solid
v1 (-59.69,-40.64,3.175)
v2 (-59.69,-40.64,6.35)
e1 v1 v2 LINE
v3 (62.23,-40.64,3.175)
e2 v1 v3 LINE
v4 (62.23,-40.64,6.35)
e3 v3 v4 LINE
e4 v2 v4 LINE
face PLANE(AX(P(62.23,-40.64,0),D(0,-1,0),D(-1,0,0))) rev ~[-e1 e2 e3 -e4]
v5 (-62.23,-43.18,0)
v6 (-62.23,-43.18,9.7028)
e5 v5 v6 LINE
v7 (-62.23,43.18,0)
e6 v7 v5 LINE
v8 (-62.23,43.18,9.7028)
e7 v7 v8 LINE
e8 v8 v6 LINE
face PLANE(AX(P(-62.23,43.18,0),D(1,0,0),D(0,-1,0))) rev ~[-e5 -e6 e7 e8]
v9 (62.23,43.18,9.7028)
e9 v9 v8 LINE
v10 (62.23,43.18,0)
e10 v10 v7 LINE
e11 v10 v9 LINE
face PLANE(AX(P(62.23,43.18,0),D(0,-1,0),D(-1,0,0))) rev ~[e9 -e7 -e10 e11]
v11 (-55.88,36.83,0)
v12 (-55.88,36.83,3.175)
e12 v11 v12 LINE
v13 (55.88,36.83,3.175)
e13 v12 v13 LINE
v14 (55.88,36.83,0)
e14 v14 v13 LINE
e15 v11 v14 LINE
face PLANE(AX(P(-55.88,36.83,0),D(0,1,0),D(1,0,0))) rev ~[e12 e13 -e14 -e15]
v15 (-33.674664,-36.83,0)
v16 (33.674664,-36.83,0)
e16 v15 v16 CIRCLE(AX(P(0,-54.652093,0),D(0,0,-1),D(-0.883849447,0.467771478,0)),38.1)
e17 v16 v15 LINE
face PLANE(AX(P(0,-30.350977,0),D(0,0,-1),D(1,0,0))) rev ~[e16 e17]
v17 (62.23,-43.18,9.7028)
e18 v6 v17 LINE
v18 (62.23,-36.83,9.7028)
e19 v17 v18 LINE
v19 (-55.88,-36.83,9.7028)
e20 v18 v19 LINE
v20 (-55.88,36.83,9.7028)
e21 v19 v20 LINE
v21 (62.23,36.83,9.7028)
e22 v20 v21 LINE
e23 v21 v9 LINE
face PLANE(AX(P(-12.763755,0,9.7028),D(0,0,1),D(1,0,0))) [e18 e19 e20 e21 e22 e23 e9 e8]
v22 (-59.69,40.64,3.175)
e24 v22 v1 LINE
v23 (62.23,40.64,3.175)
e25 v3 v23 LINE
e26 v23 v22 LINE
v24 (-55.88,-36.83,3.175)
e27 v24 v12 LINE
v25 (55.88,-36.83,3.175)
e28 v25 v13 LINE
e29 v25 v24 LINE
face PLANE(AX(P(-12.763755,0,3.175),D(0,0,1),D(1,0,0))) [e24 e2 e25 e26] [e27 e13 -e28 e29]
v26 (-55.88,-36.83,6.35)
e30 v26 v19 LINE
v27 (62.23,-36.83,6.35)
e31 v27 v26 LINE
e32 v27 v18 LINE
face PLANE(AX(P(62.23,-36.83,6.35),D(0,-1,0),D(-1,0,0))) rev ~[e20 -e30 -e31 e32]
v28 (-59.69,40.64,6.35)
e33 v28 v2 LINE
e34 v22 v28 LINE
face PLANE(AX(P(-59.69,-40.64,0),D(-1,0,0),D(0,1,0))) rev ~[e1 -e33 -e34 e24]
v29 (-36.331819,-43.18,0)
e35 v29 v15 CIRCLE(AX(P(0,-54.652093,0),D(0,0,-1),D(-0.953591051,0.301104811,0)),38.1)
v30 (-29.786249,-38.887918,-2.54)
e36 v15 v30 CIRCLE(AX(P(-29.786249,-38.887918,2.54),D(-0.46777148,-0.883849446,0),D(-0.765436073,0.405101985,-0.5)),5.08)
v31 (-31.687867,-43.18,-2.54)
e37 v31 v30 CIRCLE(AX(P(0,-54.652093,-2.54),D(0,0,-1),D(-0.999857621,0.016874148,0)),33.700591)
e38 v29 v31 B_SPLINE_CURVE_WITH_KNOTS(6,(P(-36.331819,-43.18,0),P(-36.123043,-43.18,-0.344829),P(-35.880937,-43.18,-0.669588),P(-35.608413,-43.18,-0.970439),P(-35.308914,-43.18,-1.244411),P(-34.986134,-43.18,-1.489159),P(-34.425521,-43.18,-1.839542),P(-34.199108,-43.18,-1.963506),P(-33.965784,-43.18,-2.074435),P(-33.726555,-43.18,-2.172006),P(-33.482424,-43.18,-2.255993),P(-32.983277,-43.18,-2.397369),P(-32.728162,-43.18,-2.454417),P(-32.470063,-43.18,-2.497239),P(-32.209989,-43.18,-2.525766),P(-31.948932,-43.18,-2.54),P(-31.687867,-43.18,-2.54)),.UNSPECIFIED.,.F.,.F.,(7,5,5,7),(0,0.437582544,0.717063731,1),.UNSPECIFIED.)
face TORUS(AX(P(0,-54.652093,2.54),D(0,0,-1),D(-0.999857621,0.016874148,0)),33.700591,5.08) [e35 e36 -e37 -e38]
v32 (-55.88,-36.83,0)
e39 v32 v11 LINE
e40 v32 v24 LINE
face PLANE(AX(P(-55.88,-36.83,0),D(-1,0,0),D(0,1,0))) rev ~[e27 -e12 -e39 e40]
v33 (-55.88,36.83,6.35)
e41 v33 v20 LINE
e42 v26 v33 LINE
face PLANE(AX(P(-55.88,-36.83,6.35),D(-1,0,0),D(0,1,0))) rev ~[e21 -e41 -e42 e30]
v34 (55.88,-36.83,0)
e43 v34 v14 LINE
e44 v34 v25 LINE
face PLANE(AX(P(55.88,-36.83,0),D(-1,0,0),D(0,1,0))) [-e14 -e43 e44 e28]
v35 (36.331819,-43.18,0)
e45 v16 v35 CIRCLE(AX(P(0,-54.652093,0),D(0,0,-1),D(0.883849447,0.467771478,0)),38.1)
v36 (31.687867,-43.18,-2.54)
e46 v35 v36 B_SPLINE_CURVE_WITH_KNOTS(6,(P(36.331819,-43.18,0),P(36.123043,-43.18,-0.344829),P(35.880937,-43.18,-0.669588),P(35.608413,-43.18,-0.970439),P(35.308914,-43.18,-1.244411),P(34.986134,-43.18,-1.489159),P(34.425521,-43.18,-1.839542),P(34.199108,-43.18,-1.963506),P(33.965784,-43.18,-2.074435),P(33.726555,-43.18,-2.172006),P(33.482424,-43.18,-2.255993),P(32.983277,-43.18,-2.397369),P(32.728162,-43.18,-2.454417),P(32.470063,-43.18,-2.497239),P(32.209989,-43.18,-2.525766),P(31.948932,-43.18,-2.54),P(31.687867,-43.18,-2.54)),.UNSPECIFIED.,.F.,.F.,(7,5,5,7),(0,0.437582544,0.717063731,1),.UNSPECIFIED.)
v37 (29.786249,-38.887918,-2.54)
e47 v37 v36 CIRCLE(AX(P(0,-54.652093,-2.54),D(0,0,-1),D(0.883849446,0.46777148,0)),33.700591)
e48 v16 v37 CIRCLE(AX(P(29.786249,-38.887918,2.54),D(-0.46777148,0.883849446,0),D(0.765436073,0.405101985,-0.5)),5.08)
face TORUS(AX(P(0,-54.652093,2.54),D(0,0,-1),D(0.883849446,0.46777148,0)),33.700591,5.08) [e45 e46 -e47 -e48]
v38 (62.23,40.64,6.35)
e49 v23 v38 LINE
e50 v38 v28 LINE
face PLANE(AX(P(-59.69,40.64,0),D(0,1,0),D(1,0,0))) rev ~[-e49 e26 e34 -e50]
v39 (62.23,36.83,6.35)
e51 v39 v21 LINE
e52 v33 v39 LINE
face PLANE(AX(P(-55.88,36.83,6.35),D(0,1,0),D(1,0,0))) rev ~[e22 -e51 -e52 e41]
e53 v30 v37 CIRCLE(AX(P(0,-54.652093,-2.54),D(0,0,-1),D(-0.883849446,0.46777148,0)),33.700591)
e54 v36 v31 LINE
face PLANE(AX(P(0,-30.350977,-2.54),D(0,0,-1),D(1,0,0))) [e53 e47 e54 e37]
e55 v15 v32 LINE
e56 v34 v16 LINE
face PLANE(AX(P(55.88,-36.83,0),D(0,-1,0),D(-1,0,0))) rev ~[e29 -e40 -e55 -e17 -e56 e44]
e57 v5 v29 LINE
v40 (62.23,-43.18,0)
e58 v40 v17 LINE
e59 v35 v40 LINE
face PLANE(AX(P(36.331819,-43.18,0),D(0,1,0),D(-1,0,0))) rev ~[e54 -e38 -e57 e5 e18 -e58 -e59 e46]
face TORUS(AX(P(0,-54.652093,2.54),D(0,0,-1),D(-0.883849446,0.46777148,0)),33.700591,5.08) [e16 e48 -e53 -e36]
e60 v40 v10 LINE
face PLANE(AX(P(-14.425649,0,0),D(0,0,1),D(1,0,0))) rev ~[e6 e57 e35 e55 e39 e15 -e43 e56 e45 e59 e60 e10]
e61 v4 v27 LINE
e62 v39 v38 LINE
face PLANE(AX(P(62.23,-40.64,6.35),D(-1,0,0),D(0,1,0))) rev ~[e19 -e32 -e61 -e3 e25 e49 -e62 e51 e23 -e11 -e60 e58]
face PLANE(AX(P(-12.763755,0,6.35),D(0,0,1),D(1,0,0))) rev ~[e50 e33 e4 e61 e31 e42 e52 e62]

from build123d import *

# Parameters (mm, degrees)
F0_W        = 2.54
F0_H        = 3.81
F0_W_2      = 3.81
F0_H_2      = 73.66
F1_DEPTH    = 3.175
F2_DEPTH    = 9.7028
F3_START    = 6.35
F3_DEPTH    = 3.3528
F5_DEPTH    = 2.54
F6_T2_ANGLE = 26.9228721227
F6_T4_ANGLE = 124.2205290786
F6_T6_ANGLE = 26.9228721227


# Not quite as in the source:
# - a fillet or chamfer that OpenCascade refuses, or shapes differently, is made with other operations: its cross-section is extruded or revolved along the edge and cut away or added


with BuildPart() as f1:
    # F0 (on Top) → F1 (new body)
    with BuildSketch(Plane.XY):
        Polygon((-55.88, -36.83), (-55.88, 36.83), (55.88, 36.83), (59.69, 36.83), (59.69, 40.64), (-59.69, 40.64), (-59.69, -40.64), (59.69, -40.64), (59.69, -36.83), (55.88, -36.83), align=None)
        with Locations((60.96, 38.735)):
            Rectangle(F0_W, F0_H)
        with Locations((60.96, -38.735)):
            Rectangle(F0_W, F0_H)
        with Locations((57.785, 0)):
            Rectangle(F0_W_2, F0_H_2)
        with Locations((60.96, 0)):
            Rectangle(F0_W, F0_H_2)
    extrude(amount=F1_DEPTH)

    # F0 (on Top) → F2 (join)
    with BuildSketch(Plane.XY):
        Polygon((-59.69, 40.64), (59.69, 40.64), (62.23, 40.64), (62.23, 43.18), (-62.23, 43.18), (-62.23, -43.18), (62.23, -43.18), (62.23, -40.64), (59.69, -40.64), (-59.69, -40.64), align=None)
    extrude(amount=F2_DEPTH)

    # F0 (on Top) → F3 (join)
    with BuildSketch(Plane.XY.offset(F3_START)):
        Polygon((-55.88, -36.83), (-55.88, 36.83), (55.88, 36.83), (59.69, 36.83), (59.69, 40.64), (-59.69, 40.64), (-59.69, -40.64), (59.69, -40.64), (59.69, -36.83), (55.88, -36.83), align=None)
        with Locations((60.96, -38.735)):
            Rectangle(F0_W, F0_H)
        with Locations((60.96, 38.735)):
            Rectangle(F0_W, F0_H)
    extrude(amount=F3_DEPTH)

    # F4 (on face) → F5 (join)
    with BuildSketch(Plane(origin=(0, 0, 0), x_dir=(1, 0, 0), z_dir=(0, 0, -1))):
        with BuildLine():
            Line((33.6746639179, 36.83), (-33.6746639179, 36.83))
            ThreePointArc((-33.6746639179, 36.83), (0, 16.5520933119), (33.6746639179, 36.83))
        make_face()
        with BuildLine():
            Line((36.331819044, 43.18), (-36.331819044, 43.18))
            ThreePointArc((-36.331819044, 43.18), (-35.1469421027, 39.9448685285), (-33.6746639179, 36.83))
            Line((-33.6746639179, 36.83), (33.6746639179, 36.83))
            ThreePointArc((33.6746639179, 36.83), (35.1469421027, 39.9448685285), (36.331819044, 43.18))
        make_face()
    extrude(amount=F5_DEPTH)

    # F6: fillet of radius 5.08 on 1 edges, made by hand

    # F6_s1 → F6_t2 (revolve, cut)
    with BuildSketch(Plane(origin=(-0.9220761964, -54.6365318462, 0), x_dir=(0, 0, 1), z_dir=(-0.0168741478, -0.9998576214, 0))):
        with BuildLine():
            ThreePointArc((0, 37.177792501), (-1.8594090512, 35.3183834498), (-2.54, 32.7783834498))
            Line((-2.54, 32.7783834498), (-2.54, 37.177792501))
            Line((-2.54, 37.177792501), (0, 37.177792501))
        make_face()
    revolve(axis=Axis((0, -54.6520933119, -2.54), (0, 0, -1)), revolution_arc=F6_T2_ANGLE, mode=Mode.SUBTRACT)

    # F6_s3 → F6_t4 (revolve, cut)
    with BuildSketch(Plane(origin=(-22.5953375952, -42.6936601597, 0), x_dir=(0, 0, 1), z_dir=(-0.4677714801, -0.8838494455, 0))):
        with BuildLine():
            ThreePointArc((0, 12.5353094191), (-1.8594090512, 10.6759003679), (-2.54, 8.1359003679))
            Line((-2.54, 8.1359003679), (-2.54, 12.5353094191))
            Line((-2.54, 12.5353094191), (0, 12.5353094191))
        make_face()
    revolve(axis=Axis((0, -54.6520933119, -2.54), (0, 0, -1)), revolution_arc=F6_T4_ANGLE, mode=Mode.SUBTRACT)

    # F6_s5 → F6_t6 (revolve, cut)
    with BuildSketch(Plane(origin=(22.5953375952, -42.6936601597, 0), x_dir=(0, 0, 1), z_dir=(-0.4677714801, 0.8838494455, 0))):
        with BuildLine():
            ThreePointArc((0, 12.5353094191), (-1.8594090512, 10.6759003679), (-2.54, 8.1359003679))
            Line((-2.54, 8.1359003679), (-2.54, 12.5353094191))
            Line((-2.54, 12.5353094191), (0, 12.5353094191))
        make_face()
    revolve(axis=Axis((0, -54.6520933119, -2.54), (0, 0, -1)), revolution_arc=F6_T6_ANGLE, mode=Mode.SUBTRACT)


solid = f1.part
